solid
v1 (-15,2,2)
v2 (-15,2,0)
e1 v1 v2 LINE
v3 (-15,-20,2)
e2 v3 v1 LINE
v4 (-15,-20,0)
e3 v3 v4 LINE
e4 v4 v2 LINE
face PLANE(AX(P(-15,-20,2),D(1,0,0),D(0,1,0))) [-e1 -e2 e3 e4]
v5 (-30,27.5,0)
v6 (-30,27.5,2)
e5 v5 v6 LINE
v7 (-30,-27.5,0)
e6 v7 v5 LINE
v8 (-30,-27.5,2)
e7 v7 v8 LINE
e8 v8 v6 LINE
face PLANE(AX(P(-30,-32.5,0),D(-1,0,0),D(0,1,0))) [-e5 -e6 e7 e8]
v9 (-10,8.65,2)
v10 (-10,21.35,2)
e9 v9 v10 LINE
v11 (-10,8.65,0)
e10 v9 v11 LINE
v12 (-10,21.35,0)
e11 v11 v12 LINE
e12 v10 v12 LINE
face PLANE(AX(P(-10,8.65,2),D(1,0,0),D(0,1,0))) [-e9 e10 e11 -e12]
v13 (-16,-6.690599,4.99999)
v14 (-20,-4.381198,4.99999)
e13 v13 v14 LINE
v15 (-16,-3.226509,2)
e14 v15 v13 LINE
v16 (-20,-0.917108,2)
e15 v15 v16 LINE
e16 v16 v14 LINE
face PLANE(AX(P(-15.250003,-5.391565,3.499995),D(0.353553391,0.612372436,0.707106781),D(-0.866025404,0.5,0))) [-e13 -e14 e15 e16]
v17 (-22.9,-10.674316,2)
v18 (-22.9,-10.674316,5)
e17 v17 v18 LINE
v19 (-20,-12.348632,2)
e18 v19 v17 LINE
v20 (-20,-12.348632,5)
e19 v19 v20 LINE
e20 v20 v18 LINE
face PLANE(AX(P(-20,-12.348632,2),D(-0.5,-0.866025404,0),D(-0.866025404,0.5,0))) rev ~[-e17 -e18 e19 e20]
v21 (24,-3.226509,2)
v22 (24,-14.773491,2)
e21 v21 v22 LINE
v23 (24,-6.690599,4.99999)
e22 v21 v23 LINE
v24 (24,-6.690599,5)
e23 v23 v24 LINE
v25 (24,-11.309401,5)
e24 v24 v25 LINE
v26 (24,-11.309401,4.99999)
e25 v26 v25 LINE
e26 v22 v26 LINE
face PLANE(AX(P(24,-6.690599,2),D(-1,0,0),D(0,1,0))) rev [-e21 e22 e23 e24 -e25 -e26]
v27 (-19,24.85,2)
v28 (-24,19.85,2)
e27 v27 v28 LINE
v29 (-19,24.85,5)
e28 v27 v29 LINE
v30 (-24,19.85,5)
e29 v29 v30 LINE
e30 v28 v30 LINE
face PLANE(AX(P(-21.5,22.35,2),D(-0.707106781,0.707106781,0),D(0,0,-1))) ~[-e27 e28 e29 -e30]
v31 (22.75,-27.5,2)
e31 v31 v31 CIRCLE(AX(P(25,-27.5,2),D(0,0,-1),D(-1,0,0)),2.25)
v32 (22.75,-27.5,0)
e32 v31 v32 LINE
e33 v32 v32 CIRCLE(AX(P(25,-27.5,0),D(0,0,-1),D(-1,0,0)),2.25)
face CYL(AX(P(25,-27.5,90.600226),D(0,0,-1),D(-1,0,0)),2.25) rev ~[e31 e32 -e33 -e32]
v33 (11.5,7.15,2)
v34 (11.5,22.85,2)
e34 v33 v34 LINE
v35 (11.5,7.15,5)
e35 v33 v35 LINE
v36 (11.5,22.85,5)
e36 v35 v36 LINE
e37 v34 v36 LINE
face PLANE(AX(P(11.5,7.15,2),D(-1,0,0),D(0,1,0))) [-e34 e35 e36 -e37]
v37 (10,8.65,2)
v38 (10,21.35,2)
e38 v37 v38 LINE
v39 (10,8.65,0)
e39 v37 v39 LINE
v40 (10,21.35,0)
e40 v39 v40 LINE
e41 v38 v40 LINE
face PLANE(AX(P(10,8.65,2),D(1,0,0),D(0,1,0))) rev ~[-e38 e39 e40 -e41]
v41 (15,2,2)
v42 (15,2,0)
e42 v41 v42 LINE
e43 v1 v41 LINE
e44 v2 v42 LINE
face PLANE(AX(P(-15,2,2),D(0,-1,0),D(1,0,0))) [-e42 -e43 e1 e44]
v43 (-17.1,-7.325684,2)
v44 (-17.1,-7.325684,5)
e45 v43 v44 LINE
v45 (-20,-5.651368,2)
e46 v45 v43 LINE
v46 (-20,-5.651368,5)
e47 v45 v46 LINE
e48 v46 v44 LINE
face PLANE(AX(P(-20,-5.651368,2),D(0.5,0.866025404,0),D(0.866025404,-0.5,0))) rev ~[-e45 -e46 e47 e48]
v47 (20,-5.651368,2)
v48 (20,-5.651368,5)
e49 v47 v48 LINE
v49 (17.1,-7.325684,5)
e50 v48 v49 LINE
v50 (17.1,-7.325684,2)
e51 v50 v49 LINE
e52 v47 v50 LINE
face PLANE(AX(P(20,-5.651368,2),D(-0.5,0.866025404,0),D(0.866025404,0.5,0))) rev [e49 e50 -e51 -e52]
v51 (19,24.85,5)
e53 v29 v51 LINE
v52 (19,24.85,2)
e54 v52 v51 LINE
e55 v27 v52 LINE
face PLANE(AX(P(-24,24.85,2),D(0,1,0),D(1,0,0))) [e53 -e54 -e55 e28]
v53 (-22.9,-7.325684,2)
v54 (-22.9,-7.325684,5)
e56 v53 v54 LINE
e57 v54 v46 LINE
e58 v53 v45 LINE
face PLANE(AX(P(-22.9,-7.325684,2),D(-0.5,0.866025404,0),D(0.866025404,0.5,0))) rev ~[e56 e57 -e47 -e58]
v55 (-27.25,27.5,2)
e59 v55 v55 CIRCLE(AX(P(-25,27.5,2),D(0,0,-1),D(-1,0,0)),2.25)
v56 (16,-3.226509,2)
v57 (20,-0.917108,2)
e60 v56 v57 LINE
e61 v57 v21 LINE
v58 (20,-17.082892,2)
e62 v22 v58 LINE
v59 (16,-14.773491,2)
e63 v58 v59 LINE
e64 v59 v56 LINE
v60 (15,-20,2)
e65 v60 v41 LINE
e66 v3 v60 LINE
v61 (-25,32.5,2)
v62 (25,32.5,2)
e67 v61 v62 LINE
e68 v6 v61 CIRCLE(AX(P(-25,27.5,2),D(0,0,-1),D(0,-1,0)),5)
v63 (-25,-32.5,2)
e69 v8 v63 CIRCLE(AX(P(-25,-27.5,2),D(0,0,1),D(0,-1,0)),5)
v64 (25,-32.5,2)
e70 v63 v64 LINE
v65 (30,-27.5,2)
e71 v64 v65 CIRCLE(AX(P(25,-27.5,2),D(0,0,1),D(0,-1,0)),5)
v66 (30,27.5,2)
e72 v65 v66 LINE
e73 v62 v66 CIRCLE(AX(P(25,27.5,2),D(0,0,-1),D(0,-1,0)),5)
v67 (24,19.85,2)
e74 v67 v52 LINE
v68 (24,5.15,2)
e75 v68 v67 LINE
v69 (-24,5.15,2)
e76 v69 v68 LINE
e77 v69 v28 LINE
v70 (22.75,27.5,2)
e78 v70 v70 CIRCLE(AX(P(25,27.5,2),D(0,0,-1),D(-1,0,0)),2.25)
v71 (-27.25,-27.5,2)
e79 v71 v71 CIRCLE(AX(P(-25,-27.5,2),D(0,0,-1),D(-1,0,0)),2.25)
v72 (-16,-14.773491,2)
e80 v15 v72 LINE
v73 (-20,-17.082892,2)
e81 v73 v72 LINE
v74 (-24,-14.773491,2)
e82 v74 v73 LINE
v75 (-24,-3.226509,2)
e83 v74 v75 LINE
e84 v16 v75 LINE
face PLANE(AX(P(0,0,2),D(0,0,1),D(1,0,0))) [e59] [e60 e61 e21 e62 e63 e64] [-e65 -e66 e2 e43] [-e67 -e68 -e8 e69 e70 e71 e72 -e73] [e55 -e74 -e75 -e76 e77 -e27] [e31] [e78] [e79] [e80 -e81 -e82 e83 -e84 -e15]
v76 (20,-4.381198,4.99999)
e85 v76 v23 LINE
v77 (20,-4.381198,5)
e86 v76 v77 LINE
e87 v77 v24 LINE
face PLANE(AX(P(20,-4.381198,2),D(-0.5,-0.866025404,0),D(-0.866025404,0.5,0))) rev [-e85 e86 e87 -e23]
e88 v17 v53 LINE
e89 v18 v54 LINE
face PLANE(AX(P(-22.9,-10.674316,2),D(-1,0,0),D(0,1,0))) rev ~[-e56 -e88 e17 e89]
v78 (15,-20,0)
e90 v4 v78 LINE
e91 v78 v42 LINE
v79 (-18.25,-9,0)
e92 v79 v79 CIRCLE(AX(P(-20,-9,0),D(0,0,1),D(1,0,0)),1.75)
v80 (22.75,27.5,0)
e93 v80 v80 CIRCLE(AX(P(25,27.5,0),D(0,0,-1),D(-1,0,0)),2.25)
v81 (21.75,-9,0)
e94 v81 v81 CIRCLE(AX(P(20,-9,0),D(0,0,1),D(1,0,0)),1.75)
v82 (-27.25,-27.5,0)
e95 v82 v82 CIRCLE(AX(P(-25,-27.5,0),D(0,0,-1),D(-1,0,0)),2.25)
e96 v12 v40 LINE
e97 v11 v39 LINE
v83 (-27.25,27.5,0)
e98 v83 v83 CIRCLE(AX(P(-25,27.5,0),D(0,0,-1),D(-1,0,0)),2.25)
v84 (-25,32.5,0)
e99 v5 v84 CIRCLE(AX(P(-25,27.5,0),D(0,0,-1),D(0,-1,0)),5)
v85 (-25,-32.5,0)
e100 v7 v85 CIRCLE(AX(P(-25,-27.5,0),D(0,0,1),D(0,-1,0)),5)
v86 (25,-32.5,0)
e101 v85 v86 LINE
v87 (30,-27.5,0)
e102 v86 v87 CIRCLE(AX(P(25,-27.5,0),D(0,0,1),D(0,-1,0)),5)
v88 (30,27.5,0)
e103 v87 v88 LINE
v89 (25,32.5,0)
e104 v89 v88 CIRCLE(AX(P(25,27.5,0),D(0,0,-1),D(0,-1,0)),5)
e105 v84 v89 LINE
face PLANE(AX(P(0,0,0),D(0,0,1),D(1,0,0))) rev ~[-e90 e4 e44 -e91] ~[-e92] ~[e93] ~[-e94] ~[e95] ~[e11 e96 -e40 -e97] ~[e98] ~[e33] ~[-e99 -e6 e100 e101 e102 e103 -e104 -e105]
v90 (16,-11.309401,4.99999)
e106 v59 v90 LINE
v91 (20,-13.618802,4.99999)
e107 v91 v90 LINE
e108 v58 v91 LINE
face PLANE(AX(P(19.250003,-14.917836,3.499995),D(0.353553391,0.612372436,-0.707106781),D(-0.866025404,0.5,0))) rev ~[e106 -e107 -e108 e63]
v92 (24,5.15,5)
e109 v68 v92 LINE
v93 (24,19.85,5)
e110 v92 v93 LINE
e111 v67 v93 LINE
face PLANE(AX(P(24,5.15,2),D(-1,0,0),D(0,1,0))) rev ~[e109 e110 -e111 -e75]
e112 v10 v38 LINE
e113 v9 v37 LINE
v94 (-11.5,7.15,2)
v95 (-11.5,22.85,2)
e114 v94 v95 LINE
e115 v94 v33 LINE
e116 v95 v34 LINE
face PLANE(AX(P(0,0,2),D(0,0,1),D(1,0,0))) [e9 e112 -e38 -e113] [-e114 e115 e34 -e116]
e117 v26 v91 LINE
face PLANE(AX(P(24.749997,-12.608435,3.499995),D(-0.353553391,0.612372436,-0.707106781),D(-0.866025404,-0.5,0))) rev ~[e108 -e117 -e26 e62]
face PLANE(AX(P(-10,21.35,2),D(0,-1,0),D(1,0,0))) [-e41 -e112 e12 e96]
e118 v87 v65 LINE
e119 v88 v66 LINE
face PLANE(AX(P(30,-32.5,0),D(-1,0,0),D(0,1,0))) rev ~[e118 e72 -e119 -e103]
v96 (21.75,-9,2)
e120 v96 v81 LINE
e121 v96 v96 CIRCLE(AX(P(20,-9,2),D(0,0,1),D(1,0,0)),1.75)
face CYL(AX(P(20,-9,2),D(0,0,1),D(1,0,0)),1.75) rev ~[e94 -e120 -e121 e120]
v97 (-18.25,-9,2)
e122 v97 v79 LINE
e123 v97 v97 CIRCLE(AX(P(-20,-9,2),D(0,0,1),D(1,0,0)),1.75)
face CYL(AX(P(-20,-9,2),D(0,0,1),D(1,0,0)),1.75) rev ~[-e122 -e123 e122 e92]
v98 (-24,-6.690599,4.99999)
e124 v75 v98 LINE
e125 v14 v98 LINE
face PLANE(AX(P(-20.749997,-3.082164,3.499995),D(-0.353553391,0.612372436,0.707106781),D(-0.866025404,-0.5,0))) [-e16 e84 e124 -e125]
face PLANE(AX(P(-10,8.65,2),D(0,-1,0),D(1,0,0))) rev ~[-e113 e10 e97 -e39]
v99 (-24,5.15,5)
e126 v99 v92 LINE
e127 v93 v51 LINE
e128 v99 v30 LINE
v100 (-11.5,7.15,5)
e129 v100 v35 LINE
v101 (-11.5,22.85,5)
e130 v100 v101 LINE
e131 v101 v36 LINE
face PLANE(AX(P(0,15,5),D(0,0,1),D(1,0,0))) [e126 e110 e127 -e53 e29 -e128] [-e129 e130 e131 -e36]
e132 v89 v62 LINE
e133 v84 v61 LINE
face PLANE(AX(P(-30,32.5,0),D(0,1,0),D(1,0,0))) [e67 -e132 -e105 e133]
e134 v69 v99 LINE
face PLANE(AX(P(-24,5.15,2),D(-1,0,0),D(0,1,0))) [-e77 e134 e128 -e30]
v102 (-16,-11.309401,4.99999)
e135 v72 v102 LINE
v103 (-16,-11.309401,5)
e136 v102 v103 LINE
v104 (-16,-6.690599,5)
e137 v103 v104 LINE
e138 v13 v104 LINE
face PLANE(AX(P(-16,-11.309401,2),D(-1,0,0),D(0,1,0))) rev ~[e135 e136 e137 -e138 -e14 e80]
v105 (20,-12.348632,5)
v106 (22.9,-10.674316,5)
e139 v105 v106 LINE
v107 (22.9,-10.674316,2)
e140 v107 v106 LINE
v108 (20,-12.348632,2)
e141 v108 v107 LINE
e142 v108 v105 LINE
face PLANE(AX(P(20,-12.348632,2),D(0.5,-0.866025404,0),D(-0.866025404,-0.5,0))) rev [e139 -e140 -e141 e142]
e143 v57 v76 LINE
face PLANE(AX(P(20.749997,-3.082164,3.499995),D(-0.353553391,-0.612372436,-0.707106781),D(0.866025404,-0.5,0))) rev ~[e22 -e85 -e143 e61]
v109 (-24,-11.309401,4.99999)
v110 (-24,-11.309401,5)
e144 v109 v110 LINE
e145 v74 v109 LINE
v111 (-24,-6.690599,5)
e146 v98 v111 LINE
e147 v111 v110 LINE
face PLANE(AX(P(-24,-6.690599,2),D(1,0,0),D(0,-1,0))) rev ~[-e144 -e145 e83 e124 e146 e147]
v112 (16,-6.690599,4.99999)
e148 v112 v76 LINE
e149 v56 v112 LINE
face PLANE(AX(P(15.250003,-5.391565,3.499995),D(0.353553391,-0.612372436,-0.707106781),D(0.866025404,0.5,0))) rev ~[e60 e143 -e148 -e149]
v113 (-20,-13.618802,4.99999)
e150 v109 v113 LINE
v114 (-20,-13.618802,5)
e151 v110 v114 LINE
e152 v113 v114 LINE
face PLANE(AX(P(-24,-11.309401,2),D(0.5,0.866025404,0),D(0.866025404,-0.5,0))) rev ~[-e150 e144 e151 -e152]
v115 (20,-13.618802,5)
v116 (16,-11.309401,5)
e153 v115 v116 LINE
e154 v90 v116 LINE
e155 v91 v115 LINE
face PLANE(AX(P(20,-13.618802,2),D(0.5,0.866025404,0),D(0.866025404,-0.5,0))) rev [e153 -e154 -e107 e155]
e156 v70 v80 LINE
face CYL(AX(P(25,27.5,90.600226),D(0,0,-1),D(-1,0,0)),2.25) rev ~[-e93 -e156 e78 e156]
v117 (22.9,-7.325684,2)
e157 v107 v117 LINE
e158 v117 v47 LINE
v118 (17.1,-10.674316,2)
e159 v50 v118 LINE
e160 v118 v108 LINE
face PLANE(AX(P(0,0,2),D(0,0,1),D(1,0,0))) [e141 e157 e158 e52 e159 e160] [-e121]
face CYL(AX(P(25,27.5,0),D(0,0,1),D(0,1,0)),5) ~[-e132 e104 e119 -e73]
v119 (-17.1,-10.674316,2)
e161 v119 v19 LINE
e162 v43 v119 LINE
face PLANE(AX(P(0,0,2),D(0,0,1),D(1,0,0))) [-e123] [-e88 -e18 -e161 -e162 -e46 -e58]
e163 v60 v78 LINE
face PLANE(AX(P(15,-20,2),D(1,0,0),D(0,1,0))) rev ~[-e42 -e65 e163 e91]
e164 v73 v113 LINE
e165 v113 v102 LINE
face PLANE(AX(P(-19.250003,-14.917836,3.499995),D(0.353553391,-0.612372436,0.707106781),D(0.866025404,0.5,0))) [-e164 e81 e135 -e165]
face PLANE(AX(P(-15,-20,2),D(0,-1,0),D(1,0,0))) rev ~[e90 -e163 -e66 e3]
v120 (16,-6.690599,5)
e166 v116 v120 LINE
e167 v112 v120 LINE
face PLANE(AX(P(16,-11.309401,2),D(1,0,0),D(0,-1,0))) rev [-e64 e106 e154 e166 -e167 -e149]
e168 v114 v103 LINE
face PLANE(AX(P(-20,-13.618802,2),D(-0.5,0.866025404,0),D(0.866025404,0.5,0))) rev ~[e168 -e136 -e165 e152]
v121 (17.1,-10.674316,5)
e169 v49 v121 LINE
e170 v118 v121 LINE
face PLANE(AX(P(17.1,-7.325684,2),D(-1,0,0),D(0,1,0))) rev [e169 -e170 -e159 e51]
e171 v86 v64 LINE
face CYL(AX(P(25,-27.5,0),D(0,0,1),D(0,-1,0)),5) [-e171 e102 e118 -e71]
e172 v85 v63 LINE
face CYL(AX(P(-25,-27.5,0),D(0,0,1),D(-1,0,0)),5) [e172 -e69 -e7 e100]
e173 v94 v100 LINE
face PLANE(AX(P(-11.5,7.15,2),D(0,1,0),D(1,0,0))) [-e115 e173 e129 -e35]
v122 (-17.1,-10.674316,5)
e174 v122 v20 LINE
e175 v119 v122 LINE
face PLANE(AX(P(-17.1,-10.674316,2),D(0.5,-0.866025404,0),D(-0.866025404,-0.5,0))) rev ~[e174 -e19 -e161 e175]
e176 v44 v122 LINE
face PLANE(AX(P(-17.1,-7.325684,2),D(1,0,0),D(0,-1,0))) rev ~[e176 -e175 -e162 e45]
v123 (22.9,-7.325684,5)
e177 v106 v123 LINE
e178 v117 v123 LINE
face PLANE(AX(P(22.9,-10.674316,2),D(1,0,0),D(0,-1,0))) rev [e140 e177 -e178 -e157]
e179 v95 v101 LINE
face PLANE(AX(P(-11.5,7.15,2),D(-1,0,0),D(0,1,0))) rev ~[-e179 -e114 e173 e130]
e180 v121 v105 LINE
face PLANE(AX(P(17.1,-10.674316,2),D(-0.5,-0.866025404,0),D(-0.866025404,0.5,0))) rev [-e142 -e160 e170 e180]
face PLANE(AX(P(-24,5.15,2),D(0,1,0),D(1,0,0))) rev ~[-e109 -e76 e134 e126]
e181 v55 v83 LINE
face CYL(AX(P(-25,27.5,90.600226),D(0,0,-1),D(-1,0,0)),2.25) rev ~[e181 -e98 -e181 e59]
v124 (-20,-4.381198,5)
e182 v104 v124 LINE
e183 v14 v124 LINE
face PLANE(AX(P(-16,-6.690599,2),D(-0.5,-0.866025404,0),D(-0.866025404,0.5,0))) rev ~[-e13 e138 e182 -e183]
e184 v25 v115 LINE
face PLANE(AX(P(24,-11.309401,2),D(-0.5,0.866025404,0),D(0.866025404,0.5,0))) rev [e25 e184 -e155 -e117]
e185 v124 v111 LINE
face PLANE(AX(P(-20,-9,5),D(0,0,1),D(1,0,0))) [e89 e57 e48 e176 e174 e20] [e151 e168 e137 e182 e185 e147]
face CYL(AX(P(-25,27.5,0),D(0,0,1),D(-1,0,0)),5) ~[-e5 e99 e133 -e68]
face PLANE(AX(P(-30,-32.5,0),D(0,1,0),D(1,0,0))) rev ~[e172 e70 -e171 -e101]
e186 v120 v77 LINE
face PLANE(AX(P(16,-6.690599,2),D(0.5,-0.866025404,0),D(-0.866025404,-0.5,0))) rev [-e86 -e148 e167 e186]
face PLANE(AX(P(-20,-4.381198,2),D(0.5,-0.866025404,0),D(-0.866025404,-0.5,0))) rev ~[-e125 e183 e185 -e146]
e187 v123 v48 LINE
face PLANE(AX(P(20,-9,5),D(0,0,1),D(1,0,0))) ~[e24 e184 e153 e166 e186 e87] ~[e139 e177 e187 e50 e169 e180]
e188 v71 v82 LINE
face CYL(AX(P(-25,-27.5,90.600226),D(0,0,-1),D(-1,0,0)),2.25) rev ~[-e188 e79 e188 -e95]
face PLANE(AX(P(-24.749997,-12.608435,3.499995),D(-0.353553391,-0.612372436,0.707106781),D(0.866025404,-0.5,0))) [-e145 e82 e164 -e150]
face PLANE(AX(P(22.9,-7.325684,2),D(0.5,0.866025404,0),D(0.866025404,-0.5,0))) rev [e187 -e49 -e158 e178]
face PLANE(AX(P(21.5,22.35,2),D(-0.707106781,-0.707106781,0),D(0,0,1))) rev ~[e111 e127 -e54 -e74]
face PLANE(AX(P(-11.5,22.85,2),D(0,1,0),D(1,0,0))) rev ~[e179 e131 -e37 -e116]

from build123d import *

# Parameters (mm, degrees)
F0_W      = 60
F0_H      = 65
F1_DEPTH  = 2
F2_W      = 20
F2_H      = 12.7
F3_DEPTH  = 25
F4_R      = 1.75
F4_W      = 30
F4_H      = 22
F5_DEPTH  = 25
F7_DEPTH  = 3
F8_SIZE   = 2.99999
F10_D     = 4.5
F11_R     = 5
F12_W     = 48
F12_H     = 19.7
F12_W_2   = 23
F12_H_2   = 15.7
F13_DEPTH = 3
F14_SIZE  = 5


# Not quite as in the source:
# - a fillet or chamfer is up to 0.001 mm smaller than in the source, because OpenCascade refuses the exact size
# - a pattern or mirror of a feature is missing from the dataset's text; its kind, count and spacing are read off the source's solid


with BuildPart() as f1:
    # F0 (on Top) → F1 (new body)
    with BuildSketch(Plane.XY):
        Rectangle(F0_W, F0_H)
    extrude(amount=F1_DEPTH)

    # F2 (on face) → F3 (cut)
    with BuildSketch(Plane.XY.offset(2)):
        with Locations((0, 15)):
            Rectangle(F2_W, F2_H)
    extrude(amount=-F3_DEPTH, mode=Mode.SUBTRACT)

    # F4 (on face) → F5 (cut)
    with BuildSketch(Plane.XY.offset(2)):
        with Locations((-20, -9)):
            Circle(F4_R)
        with Locations((0, -9)):
            Rectangle(F4_W, F4_H)
        with Locations((20, -9)):
            Circle(F4_R)
    extrude(amount=-F5_DEPTH, mode=Mode.SUBTRACT)

    # F6 (on face) → F7 (join)
    with BuildSketch(Plane.XY.offset(2)):
        Polygon((-24, -6.6905989232), (-24, -11.3094010768), (-20, -13.6188021535), (-16, -11.3094010768), (-16, -6.6905989232), (-20, -4.3811978465), align=None)
        Polygon((-20, -12.3486315613), (-22.9, -10.6743157806), (-22.9, -7.3256842194), (-20, -5.6513684387), (-17.1, -7.3256842194), (-17.1, -10.6743157806), align=None, mode=Mode.SUBTRACT)
    f7 = extrude(amount=F7_DEPTH)

    # F7_copies: F7 across plane
    add(f7.mirror(Plane(origin=(0, 0, 0), x_dir=(0, 0, 1), z_dir=(1, 0, 0))))

    # F8 (size 3 in the source; OpenCascade refuses exactly that, so slightly less here)
    f8_edges = [f1.edges().sort_by_distance(p)[0] for p in [
        (-22, -12.464102, 2),
        (-18, -12.464102, 2),
        (-22, -5.535898, 2),
        (-18, -5.535898, 2),
        (18, -5.535898, 2),
        (18, -12.464102, 2),
        (22, -12.464102, 2),
        (22, -5.535898, 2),
    ]]
    chamfer(f8_edges, length=F8_SIZE)

    # F10 (through all)
    with Locations(Plane.XY.offset(2)):
        with Locations((-25, 27.5), (25, 27.5), (25, -27.5), (-25, -27.5)):
            Hole(F10_D / 2)

    # F11
    f11_edges = [f1.edges().sort_by_distance(p)[0] for p in [
        (30, 32.5, 1),
        (-30, 32.5, 1),
        (30, -32.5, 1),
        (-30, -32.5, 1),
    ]]
    fillet(f11_edges, radius=F11_R)

    # F12 (on face) → F13 (join)
    with BuildSketch(Plane.XY.offset(2)):
        with Locations((0, 15)):
            Rectangle(F12_W, F12_H)
        with Locations((0, 15)):
            Rectangle(F12_W_2, F12_H_2, mode=Mode.SUBTRACT)
    extrude(amount=F13_DEPTH)

    # F14
    f14_edges = [f1.edges().sort_by_distance(p)[0] for p in [
        (24, 24.85, 3.5),
        (-24, 24.85, 3.5),
    ]]
    chamfer(f14_edges, length=F14_SIZE)


solid = f1.part
